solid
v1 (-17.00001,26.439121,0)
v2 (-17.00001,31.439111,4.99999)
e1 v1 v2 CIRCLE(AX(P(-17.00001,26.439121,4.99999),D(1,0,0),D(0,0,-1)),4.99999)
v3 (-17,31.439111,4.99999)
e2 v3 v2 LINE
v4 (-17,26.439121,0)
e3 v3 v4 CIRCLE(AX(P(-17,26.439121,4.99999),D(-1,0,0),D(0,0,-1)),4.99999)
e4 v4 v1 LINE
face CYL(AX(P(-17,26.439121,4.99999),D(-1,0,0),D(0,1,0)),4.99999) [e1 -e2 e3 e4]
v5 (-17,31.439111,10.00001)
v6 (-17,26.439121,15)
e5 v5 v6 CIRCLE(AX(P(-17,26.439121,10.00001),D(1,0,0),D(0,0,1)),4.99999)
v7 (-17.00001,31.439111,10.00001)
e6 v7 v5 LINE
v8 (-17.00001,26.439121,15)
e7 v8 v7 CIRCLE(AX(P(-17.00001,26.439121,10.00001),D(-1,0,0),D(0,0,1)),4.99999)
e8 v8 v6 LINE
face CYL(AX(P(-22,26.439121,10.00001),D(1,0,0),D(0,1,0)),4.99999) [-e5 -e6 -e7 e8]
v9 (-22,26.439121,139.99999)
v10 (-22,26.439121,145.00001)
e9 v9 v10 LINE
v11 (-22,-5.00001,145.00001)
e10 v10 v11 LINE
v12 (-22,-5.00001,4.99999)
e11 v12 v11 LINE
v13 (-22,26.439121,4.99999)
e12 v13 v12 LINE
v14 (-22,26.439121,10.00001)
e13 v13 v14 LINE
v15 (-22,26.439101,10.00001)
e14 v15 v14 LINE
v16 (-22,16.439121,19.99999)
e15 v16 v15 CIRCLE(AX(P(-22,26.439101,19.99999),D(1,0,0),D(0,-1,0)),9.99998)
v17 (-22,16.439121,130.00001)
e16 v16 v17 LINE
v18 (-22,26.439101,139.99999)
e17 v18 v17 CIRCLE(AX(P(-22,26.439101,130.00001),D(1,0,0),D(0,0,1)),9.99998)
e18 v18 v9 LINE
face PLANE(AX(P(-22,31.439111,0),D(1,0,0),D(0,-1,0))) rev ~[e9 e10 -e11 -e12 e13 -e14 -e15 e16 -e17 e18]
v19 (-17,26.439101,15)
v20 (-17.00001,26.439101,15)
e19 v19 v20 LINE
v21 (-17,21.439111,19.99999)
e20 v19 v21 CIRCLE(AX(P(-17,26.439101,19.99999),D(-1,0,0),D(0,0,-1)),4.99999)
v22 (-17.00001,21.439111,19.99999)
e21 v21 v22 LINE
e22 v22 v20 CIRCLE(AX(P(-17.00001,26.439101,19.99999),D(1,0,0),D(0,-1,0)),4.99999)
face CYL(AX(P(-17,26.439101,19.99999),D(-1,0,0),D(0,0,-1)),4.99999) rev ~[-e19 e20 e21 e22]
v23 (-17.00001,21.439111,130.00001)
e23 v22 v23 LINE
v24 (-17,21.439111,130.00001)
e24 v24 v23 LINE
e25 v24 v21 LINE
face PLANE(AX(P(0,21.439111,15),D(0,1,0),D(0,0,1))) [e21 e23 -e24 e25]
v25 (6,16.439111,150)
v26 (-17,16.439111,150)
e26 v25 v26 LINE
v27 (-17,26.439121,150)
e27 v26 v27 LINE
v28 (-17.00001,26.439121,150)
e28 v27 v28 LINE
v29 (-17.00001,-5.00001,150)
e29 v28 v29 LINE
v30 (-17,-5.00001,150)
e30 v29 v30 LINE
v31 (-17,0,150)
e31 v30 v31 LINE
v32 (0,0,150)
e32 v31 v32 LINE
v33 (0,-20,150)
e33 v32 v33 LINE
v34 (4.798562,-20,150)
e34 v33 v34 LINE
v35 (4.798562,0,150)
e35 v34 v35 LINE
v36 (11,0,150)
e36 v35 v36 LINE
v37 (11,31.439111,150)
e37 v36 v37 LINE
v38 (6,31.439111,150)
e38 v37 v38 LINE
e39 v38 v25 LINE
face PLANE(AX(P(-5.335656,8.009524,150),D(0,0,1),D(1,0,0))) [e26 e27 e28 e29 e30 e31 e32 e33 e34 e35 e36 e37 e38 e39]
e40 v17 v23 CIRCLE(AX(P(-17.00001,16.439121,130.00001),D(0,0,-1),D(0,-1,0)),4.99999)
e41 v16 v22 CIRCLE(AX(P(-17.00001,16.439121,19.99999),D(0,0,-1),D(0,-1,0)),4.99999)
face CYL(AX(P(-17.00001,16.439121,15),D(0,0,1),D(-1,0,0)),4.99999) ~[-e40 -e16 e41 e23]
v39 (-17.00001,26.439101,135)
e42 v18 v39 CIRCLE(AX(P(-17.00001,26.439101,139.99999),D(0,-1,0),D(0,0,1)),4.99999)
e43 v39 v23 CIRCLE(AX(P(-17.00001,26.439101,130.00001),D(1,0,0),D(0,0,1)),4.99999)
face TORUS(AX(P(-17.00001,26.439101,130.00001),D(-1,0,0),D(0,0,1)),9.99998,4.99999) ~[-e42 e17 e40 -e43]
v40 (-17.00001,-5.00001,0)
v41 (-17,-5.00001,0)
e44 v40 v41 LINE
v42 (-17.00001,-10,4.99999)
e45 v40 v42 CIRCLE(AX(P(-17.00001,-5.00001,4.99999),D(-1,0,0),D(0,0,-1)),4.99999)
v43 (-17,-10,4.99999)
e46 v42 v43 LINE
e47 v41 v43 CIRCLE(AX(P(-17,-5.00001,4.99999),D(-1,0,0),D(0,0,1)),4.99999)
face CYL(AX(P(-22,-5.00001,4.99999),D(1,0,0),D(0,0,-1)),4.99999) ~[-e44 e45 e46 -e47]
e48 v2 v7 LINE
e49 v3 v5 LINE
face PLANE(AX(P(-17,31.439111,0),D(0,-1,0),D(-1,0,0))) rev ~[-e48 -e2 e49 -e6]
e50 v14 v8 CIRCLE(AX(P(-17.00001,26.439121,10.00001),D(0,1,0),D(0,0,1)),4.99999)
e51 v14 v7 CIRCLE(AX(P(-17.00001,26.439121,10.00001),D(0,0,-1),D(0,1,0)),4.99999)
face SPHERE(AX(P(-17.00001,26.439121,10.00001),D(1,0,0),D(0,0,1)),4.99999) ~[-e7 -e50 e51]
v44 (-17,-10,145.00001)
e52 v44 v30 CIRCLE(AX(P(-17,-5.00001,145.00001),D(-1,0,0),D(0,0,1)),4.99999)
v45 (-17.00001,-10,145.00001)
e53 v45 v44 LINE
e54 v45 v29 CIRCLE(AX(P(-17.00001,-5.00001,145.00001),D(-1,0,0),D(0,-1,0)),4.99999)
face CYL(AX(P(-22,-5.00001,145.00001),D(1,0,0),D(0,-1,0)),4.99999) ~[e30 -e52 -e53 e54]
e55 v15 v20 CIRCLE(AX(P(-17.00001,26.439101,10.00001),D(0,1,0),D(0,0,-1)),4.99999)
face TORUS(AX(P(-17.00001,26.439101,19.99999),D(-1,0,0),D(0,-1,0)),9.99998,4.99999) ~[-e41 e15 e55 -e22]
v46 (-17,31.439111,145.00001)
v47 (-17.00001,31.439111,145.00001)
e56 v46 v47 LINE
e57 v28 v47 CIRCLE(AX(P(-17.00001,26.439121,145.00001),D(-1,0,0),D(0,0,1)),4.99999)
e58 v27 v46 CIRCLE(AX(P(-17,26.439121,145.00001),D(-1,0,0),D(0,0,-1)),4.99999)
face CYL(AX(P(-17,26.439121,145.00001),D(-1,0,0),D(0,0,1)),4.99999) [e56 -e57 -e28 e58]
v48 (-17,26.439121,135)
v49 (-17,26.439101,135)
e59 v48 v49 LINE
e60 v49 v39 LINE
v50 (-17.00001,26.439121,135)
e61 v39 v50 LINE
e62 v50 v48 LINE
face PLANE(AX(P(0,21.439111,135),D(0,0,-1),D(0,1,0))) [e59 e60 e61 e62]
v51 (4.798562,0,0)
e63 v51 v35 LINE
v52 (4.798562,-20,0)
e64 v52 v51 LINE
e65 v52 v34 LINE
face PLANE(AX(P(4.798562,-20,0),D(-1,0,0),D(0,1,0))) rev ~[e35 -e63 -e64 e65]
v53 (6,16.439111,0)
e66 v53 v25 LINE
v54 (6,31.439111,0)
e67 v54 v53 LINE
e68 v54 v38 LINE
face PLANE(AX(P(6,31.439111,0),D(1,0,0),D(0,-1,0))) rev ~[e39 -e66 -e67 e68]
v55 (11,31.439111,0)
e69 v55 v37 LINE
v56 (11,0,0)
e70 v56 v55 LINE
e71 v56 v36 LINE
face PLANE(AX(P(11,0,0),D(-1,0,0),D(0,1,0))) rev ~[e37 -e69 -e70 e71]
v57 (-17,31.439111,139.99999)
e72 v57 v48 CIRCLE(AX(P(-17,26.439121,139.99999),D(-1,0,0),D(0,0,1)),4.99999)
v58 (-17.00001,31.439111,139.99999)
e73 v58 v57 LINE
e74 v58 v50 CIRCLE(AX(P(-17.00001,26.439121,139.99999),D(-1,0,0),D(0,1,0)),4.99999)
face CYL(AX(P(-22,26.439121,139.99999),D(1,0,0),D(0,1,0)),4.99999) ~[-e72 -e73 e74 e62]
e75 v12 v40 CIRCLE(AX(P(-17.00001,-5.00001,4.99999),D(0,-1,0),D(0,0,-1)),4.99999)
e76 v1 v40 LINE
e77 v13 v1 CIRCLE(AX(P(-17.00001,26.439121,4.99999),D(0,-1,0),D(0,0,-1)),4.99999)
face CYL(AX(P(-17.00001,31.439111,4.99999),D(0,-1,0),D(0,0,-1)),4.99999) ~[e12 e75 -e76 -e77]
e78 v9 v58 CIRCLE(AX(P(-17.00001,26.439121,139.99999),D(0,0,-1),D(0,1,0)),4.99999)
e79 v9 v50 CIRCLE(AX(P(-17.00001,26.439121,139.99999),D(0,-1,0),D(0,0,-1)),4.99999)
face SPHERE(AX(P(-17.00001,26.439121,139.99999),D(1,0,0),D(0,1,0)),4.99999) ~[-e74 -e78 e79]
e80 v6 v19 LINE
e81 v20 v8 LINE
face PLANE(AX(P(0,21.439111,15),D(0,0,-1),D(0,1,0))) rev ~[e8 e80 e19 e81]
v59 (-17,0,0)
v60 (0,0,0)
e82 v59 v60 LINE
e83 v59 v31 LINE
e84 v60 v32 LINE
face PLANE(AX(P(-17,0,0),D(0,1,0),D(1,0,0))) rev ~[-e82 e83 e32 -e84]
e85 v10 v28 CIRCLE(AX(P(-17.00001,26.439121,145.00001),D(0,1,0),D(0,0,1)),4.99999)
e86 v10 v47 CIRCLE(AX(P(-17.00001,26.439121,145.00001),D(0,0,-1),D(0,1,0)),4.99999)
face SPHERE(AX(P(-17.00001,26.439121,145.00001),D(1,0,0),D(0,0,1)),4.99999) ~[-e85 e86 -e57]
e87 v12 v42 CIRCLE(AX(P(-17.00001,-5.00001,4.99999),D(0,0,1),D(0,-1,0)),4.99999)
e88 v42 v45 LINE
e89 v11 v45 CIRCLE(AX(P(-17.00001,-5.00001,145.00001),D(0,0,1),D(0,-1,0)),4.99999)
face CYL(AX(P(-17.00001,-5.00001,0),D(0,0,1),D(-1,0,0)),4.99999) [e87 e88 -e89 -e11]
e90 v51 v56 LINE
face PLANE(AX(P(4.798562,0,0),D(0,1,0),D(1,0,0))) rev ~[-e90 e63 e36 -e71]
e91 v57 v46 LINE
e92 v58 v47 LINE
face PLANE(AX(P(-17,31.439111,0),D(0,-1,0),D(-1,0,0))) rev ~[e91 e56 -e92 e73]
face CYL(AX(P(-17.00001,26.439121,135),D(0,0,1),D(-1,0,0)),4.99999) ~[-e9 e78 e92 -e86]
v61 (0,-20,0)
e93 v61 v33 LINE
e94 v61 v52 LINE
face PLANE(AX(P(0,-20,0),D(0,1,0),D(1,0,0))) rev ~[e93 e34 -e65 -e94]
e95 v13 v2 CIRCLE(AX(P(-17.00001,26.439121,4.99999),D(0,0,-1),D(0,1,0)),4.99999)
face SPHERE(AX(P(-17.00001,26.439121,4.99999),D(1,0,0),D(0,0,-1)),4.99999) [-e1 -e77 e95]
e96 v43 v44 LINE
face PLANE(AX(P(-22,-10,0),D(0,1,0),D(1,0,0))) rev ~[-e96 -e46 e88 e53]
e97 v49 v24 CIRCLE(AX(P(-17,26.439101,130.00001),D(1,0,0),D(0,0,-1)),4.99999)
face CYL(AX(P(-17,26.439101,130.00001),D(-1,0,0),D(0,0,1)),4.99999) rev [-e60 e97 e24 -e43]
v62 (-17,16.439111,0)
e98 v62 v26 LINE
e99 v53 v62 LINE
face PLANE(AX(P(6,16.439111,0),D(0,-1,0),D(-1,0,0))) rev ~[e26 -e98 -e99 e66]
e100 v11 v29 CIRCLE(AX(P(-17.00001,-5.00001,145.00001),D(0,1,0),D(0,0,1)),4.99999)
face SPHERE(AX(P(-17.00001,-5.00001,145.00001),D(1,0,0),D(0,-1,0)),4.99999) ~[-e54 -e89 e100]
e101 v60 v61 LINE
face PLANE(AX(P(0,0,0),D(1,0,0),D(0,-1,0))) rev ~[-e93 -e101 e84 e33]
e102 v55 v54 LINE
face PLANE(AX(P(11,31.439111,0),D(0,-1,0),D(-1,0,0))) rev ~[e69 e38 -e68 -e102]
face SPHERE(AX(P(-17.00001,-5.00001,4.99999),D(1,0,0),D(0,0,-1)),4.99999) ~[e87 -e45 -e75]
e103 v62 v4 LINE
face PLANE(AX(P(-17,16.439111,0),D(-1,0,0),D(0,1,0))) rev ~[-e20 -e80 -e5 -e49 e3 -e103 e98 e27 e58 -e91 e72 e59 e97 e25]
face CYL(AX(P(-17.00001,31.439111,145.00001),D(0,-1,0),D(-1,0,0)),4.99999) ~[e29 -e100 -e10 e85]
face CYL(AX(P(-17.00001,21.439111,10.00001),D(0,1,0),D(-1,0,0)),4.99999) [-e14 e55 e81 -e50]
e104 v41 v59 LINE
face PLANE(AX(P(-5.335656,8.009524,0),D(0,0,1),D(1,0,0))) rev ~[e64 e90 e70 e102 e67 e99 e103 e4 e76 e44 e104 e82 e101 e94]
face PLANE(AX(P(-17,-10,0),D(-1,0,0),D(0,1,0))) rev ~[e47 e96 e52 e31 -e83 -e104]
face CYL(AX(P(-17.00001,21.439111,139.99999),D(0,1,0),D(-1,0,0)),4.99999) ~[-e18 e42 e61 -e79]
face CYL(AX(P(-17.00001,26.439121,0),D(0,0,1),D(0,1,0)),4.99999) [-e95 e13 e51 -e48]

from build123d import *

# Parameters (mm, degrees)
F1_DEPTH = 150
F2_W     = 34.5892625776
F2_H     = 120
F3_DEPTH = 25
F4_R     = 4.99999


# Not quite as in the source:
# - a fillet or chamfer is up to 0.001 mm smaller than in the source, because OpenCascade refuses the exact size


with BuildPart() as f1:
    # F0 (on Top) → F1 (new body)
    with BuildSketch(Plane.XY):
        Polygon((-17, 31.4391109618), (-22, 31.4391109618), (-22, -10), (-17, -10), (-17, 0), (0, 0), (0, -20), (4.7985620563, -20), (4.7985620563, 0), (11, 0), (11, 31.4391109618), (6, 31.4391109618), (6, 16.4391109618), (-17, 16.4391109618), align=None)
    extrude(amount=F1_DEPTH)

    # F2 (on Right) → F3 (cut)
    with BuildSketch(Plane.YZ):
        with Locations((38.7337422506, 75)):
            Rectangle(F2_W, F2_H)
    extrude(amount=-F3_DEPTH, mode=Mode.SUBTRACT)

    # F4 (radius 5 in the source; OpenCascade refuses exactly that, so slightly less here)
    f4_edges = [f1.edges().sort_by_distance(p)[0] for p in [
        (-19.5, 21.439111, 135),
        (-19.5, 31.439111, 135),
        (-19.5, 21.439111, 15),
        (-19.5, 31.439111, 15),
        (-19.5, 31.439111, 150),
        (-19.5, -10, 150),
        (-19.5, 31.439111, 0),
        (-19.5, -10, 0),
        (-22, 10.719555, 0),
        (-22, -10, 75),
        (-22, 10.719555, 150),
        (-22, 31.439111, 142.5),
        (-22, 26.439111, 135),
        (-22, 21.439111, 75),
        (-22, 26.439111, 15),
        (-22, 31.439111, 7.5),
    ]]
    fillet(f4_edges, radius=F4_R)


solid = f1.part
